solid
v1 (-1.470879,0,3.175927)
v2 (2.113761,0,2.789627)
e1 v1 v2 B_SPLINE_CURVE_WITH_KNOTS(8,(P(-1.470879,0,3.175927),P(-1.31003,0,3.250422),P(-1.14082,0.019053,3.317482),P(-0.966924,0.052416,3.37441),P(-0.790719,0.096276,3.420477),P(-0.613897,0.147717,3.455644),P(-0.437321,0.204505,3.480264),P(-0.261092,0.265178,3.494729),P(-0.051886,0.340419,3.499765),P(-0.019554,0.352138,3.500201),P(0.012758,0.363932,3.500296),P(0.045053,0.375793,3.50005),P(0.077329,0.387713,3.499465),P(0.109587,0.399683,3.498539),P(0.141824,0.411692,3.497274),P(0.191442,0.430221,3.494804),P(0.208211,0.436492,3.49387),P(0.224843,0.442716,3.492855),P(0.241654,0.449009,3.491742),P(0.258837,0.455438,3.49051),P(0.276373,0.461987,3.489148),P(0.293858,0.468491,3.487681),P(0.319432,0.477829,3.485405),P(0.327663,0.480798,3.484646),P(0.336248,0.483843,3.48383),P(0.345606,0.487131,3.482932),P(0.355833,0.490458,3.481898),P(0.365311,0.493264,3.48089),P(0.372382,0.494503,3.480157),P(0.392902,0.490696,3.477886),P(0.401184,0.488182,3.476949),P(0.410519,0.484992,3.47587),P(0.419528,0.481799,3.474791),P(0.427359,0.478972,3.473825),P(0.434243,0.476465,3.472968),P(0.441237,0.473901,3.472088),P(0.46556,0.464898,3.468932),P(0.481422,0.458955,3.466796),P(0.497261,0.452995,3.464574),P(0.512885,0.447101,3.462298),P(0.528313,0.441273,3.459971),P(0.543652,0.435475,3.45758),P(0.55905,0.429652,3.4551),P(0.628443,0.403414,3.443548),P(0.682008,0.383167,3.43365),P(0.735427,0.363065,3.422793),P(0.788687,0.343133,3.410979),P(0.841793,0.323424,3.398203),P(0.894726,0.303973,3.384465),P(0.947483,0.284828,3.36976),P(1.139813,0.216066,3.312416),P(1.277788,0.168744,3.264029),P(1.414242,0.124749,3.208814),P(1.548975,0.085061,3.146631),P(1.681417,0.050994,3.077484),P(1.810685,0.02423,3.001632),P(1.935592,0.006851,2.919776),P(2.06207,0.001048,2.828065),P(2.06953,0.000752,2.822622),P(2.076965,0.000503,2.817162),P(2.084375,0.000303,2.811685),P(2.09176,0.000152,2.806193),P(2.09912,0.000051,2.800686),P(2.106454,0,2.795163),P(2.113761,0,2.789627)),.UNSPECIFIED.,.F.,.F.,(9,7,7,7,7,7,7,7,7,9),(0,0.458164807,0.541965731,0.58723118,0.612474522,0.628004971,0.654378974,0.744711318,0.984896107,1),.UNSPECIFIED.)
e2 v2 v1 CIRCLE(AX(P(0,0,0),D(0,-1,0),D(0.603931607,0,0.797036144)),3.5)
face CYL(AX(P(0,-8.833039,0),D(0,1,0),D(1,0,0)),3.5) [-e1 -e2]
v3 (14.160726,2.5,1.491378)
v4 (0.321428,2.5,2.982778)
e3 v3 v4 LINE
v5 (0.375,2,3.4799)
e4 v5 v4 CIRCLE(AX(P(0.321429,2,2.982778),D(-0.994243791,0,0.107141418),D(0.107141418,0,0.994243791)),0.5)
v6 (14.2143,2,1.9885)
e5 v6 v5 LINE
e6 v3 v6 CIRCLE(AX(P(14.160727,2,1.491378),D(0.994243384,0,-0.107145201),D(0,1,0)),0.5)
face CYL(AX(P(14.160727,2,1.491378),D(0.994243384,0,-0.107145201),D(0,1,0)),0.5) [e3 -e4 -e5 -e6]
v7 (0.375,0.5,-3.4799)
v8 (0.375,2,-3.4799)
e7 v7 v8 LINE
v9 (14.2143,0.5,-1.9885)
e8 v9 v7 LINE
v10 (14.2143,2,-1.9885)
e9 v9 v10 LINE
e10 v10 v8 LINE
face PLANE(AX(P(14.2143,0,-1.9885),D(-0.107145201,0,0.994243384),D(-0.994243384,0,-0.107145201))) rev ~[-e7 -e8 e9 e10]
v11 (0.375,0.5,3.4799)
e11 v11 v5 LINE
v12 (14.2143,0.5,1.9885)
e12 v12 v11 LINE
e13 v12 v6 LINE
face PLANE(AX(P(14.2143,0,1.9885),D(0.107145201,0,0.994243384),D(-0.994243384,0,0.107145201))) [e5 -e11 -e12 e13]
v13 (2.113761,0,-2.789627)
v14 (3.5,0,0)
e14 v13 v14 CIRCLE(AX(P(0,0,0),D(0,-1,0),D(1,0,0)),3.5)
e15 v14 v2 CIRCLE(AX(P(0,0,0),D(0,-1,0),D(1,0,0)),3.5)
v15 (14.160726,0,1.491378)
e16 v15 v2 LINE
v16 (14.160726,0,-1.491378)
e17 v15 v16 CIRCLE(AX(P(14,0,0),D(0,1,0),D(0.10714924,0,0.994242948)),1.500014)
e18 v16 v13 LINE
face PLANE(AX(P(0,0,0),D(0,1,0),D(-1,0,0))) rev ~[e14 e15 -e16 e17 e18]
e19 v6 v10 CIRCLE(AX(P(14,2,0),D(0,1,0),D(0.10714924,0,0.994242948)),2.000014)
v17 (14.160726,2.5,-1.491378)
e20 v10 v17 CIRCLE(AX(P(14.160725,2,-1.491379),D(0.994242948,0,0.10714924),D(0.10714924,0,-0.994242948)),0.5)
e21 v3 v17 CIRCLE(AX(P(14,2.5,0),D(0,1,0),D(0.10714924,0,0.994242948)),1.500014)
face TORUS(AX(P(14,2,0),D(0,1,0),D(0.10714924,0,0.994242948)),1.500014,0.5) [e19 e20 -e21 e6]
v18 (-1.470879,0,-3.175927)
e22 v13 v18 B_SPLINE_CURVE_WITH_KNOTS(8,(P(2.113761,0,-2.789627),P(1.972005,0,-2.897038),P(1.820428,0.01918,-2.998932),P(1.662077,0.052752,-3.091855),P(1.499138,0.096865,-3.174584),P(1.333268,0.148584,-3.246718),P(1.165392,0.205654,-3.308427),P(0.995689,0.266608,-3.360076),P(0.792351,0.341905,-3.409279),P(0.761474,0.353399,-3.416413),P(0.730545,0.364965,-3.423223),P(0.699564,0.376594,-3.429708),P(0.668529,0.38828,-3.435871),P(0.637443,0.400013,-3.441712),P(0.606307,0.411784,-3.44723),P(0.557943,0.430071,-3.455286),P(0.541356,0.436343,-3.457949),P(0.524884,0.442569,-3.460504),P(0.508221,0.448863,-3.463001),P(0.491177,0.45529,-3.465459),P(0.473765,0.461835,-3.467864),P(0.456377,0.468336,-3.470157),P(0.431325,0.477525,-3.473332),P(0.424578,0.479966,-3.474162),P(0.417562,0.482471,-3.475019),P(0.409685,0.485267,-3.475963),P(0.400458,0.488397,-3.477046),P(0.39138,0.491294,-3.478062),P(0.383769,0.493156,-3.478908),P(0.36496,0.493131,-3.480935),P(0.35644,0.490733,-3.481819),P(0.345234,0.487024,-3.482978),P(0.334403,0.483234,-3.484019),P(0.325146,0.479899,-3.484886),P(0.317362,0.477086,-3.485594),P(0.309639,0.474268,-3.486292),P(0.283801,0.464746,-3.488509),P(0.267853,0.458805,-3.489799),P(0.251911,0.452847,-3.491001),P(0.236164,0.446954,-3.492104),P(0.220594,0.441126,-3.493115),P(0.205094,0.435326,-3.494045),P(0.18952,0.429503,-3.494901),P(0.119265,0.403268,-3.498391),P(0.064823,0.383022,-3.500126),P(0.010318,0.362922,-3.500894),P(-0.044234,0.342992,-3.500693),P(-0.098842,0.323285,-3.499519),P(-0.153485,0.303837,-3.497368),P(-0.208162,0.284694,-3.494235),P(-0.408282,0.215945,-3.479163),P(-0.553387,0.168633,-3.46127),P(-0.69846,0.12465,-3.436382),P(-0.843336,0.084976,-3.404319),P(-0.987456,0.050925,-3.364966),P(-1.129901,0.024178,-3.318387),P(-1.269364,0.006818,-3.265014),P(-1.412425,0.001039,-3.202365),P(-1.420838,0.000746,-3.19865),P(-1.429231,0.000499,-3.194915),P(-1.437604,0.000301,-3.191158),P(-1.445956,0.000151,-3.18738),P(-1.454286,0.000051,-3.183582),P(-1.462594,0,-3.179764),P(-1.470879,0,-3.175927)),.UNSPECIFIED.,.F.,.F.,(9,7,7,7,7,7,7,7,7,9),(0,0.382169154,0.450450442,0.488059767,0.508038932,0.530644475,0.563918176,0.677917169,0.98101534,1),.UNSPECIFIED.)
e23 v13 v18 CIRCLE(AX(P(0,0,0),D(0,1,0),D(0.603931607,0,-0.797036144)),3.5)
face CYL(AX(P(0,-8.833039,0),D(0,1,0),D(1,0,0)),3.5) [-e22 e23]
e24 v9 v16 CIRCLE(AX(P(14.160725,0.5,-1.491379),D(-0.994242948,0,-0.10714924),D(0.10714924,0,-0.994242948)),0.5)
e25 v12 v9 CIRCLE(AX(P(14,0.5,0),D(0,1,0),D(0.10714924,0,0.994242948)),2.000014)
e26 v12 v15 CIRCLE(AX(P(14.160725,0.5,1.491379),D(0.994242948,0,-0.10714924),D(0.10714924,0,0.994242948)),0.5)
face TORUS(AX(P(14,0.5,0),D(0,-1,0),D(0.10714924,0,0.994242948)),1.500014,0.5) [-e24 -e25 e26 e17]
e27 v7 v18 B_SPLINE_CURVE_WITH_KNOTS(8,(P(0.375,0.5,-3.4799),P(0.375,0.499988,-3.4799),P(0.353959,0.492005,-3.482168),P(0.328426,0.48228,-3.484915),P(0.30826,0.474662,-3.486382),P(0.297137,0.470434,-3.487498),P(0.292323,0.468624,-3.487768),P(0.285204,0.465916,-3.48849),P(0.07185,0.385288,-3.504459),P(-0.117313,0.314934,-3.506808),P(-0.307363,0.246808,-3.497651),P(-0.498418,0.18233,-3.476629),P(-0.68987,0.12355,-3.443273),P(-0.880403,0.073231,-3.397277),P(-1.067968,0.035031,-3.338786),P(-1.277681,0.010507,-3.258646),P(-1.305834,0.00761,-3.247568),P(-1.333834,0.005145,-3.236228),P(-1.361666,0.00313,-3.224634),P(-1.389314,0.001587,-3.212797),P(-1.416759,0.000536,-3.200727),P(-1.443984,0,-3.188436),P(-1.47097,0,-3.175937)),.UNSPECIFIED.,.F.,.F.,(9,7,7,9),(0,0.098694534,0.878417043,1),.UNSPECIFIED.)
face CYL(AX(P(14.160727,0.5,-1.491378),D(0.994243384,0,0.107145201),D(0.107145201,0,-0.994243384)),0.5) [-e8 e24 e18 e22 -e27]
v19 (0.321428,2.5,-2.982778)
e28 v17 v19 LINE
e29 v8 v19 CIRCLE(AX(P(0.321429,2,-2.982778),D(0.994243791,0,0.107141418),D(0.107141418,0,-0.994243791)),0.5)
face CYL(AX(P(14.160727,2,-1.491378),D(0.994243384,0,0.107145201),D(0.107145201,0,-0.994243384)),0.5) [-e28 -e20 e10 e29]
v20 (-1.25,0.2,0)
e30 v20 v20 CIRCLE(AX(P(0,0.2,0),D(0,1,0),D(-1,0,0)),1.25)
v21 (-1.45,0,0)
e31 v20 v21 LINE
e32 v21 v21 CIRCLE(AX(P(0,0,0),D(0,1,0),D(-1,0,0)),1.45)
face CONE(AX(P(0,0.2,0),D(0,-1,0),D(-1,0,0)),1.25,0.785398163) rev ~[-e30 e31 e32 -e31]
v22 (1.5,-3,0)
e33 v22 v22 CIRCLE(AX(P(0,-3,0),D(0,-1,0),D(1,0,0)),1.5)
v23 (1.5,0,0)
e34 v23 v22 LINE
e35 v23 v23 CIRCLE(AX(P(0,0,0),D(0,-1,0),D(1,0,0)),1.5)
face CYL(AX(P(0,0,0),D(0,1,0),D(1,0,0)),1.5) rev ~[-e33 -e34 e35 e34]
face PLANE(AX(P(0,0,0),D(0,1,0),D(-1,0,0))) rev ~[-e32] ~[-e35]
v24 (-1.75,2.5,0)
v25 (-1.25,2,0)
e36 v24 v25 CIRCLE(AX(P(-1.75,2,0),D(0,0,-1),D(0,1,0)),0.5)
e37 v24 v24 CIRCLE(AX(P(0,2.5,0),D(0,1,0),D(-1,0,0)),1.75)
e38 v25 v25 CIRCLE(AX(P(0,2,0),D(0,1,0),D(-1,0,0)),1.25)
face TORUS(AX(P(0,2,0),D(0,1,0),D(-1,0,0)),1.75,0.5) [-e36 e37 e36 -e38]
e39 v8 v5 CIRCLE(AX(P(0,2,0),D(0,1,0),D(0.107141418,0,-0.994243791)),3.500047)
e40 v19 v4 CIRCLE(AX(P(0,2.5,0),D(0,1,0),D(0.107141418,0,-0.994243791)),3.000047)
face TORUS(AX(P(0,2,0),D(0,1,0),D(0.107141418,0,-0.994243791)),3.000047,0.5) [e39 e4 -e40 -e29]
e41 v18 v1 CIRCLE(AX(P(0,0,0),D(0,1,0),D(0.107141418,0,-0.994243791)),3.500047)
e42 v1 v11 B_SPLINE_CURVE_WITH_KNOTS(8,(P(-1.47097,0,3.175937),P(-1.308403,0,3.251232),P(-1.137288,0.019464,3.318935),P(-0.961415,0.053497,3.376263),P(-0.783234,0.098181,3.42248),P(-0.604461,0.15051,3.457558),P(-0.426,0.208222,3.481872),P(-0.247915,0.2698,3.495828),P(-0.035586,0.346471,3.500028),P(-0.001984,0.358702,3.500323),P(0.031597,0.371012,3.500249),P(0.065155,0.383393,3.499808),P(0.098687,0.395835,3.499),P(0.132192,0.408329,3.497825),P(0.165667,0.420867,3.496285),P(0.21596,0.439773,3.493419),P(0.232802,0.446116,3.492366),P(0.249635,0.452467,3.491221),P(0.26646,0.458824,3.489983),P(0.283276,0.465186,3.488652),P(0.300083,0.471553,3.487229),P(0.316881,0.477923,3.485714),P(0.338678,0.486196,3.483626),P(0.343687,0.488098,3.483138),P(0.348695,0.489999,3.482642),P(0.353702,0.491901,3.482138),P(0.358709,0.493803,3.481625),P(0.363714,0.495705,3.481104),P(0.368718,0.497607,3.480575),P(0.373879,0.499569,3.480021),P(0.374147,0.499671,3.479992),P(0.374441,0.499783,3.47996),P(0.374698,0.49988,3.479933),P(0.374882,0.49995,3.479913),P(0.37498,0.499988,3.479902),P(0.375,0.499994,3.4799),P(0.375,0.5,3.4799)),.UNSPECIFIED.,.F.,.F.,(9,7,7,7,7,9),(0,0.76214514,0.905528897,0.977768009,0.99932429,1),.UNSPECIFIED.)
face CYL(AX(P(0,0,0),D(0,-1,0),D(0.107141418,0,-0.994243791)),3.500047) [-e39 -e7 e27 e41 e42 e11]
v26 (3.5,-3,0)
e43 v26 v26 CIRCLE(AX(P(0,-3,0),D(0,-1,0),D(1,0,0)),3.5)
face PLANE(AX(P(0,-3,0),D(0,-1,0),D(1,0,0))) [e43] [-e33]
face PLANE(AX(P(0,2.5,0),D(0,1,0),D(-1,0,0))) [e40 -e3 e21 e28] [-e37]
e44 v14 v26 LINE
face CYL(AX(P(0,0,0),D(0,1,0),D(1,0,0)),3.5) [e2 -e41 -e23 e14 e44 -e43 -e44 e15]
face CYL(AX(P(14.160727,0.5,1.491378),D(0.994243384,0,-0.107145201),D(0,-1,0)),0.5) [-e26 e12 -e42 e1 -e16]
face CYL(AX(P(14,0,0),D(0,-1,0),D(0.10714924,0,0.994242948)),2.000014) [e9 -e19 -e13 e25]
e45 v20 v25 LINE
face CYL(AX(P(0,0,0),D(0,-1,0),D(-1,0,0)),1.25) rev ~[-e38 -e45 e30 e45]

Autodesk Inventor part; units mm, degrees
ref_plane "YZ Plane" through (0, 0, 0) normal (1, 0, 0) x (0, 1, 0)
ref_plane "XZ Plane" through (0, 0, 0) normal (0, 1, 0) x (-1, 0, 0)
ref_plane "XY Plane" through (0, 0, 0) normal (0, 0, 1) x (1, 0, 0)
sketch "Náčrt2" plane through (0, 0, 0) normal (0, 1, 0) x (-1, 0, 0)
  arc A0 (-0.375, -3.4799) -> (-0.375, 3.4799) centre (0, 0) ccw
  circle A1 centre (0, 0) radius 1.25
  line L0 (0, 0) -> (-14, 0) construction
  arc A2 (-14.2143, 1.9885) -> (-14.2143, -1.9885) centre (-14, 0) ccw
  line L1 (-14.2143, 1.9885) -> (-0.375, 3.4799)
  line L2 (-14.2143, -1.9885) -> (-0.375, -3.4799)
  dimension "d2" = 7
  dimension "d3" = 2.5
  dimension "d4" = 14
  dimension "d5" = 4
extrude "Vysunutí2" add sketch "Náčrt2" along normal blind 2.5
sketch "Náčrt3" plane through (0, 0, 0) normal (0, -1, 0) x (1, 0, 0)
  circle A0 centre (0, 0) radius 3.5
  circle A1 centre (0, 0) radius 1.5
  dimension "d8" = 7
  dimension "d9" = 3
extrude "Vysunutí3" add sketch "Náčrt3" along normal blind 3
fillet "Zaoblení1" radius 0.5 8 edges at (-3.5, 2.5, 0) (7.2946, 2.5, 2.7342) (16, 2.5, 0) (7.2946, 2.5, -2.7342) (1.25, 2.5, 0) (16, 0, 0) (7.2946, 0, 2.7342) (7.2946, 0, -2.7342)
thread "Thread1" size "M2.5x0.45" class "6H" standard "ANSI Metric M Profile" full length
chamfer "Chamfer1" distance 0.2 angle 45 1 edges at (1.25, 0, 0)
properties part number "rapoukServoLegv0" material "ABS Plastic"
